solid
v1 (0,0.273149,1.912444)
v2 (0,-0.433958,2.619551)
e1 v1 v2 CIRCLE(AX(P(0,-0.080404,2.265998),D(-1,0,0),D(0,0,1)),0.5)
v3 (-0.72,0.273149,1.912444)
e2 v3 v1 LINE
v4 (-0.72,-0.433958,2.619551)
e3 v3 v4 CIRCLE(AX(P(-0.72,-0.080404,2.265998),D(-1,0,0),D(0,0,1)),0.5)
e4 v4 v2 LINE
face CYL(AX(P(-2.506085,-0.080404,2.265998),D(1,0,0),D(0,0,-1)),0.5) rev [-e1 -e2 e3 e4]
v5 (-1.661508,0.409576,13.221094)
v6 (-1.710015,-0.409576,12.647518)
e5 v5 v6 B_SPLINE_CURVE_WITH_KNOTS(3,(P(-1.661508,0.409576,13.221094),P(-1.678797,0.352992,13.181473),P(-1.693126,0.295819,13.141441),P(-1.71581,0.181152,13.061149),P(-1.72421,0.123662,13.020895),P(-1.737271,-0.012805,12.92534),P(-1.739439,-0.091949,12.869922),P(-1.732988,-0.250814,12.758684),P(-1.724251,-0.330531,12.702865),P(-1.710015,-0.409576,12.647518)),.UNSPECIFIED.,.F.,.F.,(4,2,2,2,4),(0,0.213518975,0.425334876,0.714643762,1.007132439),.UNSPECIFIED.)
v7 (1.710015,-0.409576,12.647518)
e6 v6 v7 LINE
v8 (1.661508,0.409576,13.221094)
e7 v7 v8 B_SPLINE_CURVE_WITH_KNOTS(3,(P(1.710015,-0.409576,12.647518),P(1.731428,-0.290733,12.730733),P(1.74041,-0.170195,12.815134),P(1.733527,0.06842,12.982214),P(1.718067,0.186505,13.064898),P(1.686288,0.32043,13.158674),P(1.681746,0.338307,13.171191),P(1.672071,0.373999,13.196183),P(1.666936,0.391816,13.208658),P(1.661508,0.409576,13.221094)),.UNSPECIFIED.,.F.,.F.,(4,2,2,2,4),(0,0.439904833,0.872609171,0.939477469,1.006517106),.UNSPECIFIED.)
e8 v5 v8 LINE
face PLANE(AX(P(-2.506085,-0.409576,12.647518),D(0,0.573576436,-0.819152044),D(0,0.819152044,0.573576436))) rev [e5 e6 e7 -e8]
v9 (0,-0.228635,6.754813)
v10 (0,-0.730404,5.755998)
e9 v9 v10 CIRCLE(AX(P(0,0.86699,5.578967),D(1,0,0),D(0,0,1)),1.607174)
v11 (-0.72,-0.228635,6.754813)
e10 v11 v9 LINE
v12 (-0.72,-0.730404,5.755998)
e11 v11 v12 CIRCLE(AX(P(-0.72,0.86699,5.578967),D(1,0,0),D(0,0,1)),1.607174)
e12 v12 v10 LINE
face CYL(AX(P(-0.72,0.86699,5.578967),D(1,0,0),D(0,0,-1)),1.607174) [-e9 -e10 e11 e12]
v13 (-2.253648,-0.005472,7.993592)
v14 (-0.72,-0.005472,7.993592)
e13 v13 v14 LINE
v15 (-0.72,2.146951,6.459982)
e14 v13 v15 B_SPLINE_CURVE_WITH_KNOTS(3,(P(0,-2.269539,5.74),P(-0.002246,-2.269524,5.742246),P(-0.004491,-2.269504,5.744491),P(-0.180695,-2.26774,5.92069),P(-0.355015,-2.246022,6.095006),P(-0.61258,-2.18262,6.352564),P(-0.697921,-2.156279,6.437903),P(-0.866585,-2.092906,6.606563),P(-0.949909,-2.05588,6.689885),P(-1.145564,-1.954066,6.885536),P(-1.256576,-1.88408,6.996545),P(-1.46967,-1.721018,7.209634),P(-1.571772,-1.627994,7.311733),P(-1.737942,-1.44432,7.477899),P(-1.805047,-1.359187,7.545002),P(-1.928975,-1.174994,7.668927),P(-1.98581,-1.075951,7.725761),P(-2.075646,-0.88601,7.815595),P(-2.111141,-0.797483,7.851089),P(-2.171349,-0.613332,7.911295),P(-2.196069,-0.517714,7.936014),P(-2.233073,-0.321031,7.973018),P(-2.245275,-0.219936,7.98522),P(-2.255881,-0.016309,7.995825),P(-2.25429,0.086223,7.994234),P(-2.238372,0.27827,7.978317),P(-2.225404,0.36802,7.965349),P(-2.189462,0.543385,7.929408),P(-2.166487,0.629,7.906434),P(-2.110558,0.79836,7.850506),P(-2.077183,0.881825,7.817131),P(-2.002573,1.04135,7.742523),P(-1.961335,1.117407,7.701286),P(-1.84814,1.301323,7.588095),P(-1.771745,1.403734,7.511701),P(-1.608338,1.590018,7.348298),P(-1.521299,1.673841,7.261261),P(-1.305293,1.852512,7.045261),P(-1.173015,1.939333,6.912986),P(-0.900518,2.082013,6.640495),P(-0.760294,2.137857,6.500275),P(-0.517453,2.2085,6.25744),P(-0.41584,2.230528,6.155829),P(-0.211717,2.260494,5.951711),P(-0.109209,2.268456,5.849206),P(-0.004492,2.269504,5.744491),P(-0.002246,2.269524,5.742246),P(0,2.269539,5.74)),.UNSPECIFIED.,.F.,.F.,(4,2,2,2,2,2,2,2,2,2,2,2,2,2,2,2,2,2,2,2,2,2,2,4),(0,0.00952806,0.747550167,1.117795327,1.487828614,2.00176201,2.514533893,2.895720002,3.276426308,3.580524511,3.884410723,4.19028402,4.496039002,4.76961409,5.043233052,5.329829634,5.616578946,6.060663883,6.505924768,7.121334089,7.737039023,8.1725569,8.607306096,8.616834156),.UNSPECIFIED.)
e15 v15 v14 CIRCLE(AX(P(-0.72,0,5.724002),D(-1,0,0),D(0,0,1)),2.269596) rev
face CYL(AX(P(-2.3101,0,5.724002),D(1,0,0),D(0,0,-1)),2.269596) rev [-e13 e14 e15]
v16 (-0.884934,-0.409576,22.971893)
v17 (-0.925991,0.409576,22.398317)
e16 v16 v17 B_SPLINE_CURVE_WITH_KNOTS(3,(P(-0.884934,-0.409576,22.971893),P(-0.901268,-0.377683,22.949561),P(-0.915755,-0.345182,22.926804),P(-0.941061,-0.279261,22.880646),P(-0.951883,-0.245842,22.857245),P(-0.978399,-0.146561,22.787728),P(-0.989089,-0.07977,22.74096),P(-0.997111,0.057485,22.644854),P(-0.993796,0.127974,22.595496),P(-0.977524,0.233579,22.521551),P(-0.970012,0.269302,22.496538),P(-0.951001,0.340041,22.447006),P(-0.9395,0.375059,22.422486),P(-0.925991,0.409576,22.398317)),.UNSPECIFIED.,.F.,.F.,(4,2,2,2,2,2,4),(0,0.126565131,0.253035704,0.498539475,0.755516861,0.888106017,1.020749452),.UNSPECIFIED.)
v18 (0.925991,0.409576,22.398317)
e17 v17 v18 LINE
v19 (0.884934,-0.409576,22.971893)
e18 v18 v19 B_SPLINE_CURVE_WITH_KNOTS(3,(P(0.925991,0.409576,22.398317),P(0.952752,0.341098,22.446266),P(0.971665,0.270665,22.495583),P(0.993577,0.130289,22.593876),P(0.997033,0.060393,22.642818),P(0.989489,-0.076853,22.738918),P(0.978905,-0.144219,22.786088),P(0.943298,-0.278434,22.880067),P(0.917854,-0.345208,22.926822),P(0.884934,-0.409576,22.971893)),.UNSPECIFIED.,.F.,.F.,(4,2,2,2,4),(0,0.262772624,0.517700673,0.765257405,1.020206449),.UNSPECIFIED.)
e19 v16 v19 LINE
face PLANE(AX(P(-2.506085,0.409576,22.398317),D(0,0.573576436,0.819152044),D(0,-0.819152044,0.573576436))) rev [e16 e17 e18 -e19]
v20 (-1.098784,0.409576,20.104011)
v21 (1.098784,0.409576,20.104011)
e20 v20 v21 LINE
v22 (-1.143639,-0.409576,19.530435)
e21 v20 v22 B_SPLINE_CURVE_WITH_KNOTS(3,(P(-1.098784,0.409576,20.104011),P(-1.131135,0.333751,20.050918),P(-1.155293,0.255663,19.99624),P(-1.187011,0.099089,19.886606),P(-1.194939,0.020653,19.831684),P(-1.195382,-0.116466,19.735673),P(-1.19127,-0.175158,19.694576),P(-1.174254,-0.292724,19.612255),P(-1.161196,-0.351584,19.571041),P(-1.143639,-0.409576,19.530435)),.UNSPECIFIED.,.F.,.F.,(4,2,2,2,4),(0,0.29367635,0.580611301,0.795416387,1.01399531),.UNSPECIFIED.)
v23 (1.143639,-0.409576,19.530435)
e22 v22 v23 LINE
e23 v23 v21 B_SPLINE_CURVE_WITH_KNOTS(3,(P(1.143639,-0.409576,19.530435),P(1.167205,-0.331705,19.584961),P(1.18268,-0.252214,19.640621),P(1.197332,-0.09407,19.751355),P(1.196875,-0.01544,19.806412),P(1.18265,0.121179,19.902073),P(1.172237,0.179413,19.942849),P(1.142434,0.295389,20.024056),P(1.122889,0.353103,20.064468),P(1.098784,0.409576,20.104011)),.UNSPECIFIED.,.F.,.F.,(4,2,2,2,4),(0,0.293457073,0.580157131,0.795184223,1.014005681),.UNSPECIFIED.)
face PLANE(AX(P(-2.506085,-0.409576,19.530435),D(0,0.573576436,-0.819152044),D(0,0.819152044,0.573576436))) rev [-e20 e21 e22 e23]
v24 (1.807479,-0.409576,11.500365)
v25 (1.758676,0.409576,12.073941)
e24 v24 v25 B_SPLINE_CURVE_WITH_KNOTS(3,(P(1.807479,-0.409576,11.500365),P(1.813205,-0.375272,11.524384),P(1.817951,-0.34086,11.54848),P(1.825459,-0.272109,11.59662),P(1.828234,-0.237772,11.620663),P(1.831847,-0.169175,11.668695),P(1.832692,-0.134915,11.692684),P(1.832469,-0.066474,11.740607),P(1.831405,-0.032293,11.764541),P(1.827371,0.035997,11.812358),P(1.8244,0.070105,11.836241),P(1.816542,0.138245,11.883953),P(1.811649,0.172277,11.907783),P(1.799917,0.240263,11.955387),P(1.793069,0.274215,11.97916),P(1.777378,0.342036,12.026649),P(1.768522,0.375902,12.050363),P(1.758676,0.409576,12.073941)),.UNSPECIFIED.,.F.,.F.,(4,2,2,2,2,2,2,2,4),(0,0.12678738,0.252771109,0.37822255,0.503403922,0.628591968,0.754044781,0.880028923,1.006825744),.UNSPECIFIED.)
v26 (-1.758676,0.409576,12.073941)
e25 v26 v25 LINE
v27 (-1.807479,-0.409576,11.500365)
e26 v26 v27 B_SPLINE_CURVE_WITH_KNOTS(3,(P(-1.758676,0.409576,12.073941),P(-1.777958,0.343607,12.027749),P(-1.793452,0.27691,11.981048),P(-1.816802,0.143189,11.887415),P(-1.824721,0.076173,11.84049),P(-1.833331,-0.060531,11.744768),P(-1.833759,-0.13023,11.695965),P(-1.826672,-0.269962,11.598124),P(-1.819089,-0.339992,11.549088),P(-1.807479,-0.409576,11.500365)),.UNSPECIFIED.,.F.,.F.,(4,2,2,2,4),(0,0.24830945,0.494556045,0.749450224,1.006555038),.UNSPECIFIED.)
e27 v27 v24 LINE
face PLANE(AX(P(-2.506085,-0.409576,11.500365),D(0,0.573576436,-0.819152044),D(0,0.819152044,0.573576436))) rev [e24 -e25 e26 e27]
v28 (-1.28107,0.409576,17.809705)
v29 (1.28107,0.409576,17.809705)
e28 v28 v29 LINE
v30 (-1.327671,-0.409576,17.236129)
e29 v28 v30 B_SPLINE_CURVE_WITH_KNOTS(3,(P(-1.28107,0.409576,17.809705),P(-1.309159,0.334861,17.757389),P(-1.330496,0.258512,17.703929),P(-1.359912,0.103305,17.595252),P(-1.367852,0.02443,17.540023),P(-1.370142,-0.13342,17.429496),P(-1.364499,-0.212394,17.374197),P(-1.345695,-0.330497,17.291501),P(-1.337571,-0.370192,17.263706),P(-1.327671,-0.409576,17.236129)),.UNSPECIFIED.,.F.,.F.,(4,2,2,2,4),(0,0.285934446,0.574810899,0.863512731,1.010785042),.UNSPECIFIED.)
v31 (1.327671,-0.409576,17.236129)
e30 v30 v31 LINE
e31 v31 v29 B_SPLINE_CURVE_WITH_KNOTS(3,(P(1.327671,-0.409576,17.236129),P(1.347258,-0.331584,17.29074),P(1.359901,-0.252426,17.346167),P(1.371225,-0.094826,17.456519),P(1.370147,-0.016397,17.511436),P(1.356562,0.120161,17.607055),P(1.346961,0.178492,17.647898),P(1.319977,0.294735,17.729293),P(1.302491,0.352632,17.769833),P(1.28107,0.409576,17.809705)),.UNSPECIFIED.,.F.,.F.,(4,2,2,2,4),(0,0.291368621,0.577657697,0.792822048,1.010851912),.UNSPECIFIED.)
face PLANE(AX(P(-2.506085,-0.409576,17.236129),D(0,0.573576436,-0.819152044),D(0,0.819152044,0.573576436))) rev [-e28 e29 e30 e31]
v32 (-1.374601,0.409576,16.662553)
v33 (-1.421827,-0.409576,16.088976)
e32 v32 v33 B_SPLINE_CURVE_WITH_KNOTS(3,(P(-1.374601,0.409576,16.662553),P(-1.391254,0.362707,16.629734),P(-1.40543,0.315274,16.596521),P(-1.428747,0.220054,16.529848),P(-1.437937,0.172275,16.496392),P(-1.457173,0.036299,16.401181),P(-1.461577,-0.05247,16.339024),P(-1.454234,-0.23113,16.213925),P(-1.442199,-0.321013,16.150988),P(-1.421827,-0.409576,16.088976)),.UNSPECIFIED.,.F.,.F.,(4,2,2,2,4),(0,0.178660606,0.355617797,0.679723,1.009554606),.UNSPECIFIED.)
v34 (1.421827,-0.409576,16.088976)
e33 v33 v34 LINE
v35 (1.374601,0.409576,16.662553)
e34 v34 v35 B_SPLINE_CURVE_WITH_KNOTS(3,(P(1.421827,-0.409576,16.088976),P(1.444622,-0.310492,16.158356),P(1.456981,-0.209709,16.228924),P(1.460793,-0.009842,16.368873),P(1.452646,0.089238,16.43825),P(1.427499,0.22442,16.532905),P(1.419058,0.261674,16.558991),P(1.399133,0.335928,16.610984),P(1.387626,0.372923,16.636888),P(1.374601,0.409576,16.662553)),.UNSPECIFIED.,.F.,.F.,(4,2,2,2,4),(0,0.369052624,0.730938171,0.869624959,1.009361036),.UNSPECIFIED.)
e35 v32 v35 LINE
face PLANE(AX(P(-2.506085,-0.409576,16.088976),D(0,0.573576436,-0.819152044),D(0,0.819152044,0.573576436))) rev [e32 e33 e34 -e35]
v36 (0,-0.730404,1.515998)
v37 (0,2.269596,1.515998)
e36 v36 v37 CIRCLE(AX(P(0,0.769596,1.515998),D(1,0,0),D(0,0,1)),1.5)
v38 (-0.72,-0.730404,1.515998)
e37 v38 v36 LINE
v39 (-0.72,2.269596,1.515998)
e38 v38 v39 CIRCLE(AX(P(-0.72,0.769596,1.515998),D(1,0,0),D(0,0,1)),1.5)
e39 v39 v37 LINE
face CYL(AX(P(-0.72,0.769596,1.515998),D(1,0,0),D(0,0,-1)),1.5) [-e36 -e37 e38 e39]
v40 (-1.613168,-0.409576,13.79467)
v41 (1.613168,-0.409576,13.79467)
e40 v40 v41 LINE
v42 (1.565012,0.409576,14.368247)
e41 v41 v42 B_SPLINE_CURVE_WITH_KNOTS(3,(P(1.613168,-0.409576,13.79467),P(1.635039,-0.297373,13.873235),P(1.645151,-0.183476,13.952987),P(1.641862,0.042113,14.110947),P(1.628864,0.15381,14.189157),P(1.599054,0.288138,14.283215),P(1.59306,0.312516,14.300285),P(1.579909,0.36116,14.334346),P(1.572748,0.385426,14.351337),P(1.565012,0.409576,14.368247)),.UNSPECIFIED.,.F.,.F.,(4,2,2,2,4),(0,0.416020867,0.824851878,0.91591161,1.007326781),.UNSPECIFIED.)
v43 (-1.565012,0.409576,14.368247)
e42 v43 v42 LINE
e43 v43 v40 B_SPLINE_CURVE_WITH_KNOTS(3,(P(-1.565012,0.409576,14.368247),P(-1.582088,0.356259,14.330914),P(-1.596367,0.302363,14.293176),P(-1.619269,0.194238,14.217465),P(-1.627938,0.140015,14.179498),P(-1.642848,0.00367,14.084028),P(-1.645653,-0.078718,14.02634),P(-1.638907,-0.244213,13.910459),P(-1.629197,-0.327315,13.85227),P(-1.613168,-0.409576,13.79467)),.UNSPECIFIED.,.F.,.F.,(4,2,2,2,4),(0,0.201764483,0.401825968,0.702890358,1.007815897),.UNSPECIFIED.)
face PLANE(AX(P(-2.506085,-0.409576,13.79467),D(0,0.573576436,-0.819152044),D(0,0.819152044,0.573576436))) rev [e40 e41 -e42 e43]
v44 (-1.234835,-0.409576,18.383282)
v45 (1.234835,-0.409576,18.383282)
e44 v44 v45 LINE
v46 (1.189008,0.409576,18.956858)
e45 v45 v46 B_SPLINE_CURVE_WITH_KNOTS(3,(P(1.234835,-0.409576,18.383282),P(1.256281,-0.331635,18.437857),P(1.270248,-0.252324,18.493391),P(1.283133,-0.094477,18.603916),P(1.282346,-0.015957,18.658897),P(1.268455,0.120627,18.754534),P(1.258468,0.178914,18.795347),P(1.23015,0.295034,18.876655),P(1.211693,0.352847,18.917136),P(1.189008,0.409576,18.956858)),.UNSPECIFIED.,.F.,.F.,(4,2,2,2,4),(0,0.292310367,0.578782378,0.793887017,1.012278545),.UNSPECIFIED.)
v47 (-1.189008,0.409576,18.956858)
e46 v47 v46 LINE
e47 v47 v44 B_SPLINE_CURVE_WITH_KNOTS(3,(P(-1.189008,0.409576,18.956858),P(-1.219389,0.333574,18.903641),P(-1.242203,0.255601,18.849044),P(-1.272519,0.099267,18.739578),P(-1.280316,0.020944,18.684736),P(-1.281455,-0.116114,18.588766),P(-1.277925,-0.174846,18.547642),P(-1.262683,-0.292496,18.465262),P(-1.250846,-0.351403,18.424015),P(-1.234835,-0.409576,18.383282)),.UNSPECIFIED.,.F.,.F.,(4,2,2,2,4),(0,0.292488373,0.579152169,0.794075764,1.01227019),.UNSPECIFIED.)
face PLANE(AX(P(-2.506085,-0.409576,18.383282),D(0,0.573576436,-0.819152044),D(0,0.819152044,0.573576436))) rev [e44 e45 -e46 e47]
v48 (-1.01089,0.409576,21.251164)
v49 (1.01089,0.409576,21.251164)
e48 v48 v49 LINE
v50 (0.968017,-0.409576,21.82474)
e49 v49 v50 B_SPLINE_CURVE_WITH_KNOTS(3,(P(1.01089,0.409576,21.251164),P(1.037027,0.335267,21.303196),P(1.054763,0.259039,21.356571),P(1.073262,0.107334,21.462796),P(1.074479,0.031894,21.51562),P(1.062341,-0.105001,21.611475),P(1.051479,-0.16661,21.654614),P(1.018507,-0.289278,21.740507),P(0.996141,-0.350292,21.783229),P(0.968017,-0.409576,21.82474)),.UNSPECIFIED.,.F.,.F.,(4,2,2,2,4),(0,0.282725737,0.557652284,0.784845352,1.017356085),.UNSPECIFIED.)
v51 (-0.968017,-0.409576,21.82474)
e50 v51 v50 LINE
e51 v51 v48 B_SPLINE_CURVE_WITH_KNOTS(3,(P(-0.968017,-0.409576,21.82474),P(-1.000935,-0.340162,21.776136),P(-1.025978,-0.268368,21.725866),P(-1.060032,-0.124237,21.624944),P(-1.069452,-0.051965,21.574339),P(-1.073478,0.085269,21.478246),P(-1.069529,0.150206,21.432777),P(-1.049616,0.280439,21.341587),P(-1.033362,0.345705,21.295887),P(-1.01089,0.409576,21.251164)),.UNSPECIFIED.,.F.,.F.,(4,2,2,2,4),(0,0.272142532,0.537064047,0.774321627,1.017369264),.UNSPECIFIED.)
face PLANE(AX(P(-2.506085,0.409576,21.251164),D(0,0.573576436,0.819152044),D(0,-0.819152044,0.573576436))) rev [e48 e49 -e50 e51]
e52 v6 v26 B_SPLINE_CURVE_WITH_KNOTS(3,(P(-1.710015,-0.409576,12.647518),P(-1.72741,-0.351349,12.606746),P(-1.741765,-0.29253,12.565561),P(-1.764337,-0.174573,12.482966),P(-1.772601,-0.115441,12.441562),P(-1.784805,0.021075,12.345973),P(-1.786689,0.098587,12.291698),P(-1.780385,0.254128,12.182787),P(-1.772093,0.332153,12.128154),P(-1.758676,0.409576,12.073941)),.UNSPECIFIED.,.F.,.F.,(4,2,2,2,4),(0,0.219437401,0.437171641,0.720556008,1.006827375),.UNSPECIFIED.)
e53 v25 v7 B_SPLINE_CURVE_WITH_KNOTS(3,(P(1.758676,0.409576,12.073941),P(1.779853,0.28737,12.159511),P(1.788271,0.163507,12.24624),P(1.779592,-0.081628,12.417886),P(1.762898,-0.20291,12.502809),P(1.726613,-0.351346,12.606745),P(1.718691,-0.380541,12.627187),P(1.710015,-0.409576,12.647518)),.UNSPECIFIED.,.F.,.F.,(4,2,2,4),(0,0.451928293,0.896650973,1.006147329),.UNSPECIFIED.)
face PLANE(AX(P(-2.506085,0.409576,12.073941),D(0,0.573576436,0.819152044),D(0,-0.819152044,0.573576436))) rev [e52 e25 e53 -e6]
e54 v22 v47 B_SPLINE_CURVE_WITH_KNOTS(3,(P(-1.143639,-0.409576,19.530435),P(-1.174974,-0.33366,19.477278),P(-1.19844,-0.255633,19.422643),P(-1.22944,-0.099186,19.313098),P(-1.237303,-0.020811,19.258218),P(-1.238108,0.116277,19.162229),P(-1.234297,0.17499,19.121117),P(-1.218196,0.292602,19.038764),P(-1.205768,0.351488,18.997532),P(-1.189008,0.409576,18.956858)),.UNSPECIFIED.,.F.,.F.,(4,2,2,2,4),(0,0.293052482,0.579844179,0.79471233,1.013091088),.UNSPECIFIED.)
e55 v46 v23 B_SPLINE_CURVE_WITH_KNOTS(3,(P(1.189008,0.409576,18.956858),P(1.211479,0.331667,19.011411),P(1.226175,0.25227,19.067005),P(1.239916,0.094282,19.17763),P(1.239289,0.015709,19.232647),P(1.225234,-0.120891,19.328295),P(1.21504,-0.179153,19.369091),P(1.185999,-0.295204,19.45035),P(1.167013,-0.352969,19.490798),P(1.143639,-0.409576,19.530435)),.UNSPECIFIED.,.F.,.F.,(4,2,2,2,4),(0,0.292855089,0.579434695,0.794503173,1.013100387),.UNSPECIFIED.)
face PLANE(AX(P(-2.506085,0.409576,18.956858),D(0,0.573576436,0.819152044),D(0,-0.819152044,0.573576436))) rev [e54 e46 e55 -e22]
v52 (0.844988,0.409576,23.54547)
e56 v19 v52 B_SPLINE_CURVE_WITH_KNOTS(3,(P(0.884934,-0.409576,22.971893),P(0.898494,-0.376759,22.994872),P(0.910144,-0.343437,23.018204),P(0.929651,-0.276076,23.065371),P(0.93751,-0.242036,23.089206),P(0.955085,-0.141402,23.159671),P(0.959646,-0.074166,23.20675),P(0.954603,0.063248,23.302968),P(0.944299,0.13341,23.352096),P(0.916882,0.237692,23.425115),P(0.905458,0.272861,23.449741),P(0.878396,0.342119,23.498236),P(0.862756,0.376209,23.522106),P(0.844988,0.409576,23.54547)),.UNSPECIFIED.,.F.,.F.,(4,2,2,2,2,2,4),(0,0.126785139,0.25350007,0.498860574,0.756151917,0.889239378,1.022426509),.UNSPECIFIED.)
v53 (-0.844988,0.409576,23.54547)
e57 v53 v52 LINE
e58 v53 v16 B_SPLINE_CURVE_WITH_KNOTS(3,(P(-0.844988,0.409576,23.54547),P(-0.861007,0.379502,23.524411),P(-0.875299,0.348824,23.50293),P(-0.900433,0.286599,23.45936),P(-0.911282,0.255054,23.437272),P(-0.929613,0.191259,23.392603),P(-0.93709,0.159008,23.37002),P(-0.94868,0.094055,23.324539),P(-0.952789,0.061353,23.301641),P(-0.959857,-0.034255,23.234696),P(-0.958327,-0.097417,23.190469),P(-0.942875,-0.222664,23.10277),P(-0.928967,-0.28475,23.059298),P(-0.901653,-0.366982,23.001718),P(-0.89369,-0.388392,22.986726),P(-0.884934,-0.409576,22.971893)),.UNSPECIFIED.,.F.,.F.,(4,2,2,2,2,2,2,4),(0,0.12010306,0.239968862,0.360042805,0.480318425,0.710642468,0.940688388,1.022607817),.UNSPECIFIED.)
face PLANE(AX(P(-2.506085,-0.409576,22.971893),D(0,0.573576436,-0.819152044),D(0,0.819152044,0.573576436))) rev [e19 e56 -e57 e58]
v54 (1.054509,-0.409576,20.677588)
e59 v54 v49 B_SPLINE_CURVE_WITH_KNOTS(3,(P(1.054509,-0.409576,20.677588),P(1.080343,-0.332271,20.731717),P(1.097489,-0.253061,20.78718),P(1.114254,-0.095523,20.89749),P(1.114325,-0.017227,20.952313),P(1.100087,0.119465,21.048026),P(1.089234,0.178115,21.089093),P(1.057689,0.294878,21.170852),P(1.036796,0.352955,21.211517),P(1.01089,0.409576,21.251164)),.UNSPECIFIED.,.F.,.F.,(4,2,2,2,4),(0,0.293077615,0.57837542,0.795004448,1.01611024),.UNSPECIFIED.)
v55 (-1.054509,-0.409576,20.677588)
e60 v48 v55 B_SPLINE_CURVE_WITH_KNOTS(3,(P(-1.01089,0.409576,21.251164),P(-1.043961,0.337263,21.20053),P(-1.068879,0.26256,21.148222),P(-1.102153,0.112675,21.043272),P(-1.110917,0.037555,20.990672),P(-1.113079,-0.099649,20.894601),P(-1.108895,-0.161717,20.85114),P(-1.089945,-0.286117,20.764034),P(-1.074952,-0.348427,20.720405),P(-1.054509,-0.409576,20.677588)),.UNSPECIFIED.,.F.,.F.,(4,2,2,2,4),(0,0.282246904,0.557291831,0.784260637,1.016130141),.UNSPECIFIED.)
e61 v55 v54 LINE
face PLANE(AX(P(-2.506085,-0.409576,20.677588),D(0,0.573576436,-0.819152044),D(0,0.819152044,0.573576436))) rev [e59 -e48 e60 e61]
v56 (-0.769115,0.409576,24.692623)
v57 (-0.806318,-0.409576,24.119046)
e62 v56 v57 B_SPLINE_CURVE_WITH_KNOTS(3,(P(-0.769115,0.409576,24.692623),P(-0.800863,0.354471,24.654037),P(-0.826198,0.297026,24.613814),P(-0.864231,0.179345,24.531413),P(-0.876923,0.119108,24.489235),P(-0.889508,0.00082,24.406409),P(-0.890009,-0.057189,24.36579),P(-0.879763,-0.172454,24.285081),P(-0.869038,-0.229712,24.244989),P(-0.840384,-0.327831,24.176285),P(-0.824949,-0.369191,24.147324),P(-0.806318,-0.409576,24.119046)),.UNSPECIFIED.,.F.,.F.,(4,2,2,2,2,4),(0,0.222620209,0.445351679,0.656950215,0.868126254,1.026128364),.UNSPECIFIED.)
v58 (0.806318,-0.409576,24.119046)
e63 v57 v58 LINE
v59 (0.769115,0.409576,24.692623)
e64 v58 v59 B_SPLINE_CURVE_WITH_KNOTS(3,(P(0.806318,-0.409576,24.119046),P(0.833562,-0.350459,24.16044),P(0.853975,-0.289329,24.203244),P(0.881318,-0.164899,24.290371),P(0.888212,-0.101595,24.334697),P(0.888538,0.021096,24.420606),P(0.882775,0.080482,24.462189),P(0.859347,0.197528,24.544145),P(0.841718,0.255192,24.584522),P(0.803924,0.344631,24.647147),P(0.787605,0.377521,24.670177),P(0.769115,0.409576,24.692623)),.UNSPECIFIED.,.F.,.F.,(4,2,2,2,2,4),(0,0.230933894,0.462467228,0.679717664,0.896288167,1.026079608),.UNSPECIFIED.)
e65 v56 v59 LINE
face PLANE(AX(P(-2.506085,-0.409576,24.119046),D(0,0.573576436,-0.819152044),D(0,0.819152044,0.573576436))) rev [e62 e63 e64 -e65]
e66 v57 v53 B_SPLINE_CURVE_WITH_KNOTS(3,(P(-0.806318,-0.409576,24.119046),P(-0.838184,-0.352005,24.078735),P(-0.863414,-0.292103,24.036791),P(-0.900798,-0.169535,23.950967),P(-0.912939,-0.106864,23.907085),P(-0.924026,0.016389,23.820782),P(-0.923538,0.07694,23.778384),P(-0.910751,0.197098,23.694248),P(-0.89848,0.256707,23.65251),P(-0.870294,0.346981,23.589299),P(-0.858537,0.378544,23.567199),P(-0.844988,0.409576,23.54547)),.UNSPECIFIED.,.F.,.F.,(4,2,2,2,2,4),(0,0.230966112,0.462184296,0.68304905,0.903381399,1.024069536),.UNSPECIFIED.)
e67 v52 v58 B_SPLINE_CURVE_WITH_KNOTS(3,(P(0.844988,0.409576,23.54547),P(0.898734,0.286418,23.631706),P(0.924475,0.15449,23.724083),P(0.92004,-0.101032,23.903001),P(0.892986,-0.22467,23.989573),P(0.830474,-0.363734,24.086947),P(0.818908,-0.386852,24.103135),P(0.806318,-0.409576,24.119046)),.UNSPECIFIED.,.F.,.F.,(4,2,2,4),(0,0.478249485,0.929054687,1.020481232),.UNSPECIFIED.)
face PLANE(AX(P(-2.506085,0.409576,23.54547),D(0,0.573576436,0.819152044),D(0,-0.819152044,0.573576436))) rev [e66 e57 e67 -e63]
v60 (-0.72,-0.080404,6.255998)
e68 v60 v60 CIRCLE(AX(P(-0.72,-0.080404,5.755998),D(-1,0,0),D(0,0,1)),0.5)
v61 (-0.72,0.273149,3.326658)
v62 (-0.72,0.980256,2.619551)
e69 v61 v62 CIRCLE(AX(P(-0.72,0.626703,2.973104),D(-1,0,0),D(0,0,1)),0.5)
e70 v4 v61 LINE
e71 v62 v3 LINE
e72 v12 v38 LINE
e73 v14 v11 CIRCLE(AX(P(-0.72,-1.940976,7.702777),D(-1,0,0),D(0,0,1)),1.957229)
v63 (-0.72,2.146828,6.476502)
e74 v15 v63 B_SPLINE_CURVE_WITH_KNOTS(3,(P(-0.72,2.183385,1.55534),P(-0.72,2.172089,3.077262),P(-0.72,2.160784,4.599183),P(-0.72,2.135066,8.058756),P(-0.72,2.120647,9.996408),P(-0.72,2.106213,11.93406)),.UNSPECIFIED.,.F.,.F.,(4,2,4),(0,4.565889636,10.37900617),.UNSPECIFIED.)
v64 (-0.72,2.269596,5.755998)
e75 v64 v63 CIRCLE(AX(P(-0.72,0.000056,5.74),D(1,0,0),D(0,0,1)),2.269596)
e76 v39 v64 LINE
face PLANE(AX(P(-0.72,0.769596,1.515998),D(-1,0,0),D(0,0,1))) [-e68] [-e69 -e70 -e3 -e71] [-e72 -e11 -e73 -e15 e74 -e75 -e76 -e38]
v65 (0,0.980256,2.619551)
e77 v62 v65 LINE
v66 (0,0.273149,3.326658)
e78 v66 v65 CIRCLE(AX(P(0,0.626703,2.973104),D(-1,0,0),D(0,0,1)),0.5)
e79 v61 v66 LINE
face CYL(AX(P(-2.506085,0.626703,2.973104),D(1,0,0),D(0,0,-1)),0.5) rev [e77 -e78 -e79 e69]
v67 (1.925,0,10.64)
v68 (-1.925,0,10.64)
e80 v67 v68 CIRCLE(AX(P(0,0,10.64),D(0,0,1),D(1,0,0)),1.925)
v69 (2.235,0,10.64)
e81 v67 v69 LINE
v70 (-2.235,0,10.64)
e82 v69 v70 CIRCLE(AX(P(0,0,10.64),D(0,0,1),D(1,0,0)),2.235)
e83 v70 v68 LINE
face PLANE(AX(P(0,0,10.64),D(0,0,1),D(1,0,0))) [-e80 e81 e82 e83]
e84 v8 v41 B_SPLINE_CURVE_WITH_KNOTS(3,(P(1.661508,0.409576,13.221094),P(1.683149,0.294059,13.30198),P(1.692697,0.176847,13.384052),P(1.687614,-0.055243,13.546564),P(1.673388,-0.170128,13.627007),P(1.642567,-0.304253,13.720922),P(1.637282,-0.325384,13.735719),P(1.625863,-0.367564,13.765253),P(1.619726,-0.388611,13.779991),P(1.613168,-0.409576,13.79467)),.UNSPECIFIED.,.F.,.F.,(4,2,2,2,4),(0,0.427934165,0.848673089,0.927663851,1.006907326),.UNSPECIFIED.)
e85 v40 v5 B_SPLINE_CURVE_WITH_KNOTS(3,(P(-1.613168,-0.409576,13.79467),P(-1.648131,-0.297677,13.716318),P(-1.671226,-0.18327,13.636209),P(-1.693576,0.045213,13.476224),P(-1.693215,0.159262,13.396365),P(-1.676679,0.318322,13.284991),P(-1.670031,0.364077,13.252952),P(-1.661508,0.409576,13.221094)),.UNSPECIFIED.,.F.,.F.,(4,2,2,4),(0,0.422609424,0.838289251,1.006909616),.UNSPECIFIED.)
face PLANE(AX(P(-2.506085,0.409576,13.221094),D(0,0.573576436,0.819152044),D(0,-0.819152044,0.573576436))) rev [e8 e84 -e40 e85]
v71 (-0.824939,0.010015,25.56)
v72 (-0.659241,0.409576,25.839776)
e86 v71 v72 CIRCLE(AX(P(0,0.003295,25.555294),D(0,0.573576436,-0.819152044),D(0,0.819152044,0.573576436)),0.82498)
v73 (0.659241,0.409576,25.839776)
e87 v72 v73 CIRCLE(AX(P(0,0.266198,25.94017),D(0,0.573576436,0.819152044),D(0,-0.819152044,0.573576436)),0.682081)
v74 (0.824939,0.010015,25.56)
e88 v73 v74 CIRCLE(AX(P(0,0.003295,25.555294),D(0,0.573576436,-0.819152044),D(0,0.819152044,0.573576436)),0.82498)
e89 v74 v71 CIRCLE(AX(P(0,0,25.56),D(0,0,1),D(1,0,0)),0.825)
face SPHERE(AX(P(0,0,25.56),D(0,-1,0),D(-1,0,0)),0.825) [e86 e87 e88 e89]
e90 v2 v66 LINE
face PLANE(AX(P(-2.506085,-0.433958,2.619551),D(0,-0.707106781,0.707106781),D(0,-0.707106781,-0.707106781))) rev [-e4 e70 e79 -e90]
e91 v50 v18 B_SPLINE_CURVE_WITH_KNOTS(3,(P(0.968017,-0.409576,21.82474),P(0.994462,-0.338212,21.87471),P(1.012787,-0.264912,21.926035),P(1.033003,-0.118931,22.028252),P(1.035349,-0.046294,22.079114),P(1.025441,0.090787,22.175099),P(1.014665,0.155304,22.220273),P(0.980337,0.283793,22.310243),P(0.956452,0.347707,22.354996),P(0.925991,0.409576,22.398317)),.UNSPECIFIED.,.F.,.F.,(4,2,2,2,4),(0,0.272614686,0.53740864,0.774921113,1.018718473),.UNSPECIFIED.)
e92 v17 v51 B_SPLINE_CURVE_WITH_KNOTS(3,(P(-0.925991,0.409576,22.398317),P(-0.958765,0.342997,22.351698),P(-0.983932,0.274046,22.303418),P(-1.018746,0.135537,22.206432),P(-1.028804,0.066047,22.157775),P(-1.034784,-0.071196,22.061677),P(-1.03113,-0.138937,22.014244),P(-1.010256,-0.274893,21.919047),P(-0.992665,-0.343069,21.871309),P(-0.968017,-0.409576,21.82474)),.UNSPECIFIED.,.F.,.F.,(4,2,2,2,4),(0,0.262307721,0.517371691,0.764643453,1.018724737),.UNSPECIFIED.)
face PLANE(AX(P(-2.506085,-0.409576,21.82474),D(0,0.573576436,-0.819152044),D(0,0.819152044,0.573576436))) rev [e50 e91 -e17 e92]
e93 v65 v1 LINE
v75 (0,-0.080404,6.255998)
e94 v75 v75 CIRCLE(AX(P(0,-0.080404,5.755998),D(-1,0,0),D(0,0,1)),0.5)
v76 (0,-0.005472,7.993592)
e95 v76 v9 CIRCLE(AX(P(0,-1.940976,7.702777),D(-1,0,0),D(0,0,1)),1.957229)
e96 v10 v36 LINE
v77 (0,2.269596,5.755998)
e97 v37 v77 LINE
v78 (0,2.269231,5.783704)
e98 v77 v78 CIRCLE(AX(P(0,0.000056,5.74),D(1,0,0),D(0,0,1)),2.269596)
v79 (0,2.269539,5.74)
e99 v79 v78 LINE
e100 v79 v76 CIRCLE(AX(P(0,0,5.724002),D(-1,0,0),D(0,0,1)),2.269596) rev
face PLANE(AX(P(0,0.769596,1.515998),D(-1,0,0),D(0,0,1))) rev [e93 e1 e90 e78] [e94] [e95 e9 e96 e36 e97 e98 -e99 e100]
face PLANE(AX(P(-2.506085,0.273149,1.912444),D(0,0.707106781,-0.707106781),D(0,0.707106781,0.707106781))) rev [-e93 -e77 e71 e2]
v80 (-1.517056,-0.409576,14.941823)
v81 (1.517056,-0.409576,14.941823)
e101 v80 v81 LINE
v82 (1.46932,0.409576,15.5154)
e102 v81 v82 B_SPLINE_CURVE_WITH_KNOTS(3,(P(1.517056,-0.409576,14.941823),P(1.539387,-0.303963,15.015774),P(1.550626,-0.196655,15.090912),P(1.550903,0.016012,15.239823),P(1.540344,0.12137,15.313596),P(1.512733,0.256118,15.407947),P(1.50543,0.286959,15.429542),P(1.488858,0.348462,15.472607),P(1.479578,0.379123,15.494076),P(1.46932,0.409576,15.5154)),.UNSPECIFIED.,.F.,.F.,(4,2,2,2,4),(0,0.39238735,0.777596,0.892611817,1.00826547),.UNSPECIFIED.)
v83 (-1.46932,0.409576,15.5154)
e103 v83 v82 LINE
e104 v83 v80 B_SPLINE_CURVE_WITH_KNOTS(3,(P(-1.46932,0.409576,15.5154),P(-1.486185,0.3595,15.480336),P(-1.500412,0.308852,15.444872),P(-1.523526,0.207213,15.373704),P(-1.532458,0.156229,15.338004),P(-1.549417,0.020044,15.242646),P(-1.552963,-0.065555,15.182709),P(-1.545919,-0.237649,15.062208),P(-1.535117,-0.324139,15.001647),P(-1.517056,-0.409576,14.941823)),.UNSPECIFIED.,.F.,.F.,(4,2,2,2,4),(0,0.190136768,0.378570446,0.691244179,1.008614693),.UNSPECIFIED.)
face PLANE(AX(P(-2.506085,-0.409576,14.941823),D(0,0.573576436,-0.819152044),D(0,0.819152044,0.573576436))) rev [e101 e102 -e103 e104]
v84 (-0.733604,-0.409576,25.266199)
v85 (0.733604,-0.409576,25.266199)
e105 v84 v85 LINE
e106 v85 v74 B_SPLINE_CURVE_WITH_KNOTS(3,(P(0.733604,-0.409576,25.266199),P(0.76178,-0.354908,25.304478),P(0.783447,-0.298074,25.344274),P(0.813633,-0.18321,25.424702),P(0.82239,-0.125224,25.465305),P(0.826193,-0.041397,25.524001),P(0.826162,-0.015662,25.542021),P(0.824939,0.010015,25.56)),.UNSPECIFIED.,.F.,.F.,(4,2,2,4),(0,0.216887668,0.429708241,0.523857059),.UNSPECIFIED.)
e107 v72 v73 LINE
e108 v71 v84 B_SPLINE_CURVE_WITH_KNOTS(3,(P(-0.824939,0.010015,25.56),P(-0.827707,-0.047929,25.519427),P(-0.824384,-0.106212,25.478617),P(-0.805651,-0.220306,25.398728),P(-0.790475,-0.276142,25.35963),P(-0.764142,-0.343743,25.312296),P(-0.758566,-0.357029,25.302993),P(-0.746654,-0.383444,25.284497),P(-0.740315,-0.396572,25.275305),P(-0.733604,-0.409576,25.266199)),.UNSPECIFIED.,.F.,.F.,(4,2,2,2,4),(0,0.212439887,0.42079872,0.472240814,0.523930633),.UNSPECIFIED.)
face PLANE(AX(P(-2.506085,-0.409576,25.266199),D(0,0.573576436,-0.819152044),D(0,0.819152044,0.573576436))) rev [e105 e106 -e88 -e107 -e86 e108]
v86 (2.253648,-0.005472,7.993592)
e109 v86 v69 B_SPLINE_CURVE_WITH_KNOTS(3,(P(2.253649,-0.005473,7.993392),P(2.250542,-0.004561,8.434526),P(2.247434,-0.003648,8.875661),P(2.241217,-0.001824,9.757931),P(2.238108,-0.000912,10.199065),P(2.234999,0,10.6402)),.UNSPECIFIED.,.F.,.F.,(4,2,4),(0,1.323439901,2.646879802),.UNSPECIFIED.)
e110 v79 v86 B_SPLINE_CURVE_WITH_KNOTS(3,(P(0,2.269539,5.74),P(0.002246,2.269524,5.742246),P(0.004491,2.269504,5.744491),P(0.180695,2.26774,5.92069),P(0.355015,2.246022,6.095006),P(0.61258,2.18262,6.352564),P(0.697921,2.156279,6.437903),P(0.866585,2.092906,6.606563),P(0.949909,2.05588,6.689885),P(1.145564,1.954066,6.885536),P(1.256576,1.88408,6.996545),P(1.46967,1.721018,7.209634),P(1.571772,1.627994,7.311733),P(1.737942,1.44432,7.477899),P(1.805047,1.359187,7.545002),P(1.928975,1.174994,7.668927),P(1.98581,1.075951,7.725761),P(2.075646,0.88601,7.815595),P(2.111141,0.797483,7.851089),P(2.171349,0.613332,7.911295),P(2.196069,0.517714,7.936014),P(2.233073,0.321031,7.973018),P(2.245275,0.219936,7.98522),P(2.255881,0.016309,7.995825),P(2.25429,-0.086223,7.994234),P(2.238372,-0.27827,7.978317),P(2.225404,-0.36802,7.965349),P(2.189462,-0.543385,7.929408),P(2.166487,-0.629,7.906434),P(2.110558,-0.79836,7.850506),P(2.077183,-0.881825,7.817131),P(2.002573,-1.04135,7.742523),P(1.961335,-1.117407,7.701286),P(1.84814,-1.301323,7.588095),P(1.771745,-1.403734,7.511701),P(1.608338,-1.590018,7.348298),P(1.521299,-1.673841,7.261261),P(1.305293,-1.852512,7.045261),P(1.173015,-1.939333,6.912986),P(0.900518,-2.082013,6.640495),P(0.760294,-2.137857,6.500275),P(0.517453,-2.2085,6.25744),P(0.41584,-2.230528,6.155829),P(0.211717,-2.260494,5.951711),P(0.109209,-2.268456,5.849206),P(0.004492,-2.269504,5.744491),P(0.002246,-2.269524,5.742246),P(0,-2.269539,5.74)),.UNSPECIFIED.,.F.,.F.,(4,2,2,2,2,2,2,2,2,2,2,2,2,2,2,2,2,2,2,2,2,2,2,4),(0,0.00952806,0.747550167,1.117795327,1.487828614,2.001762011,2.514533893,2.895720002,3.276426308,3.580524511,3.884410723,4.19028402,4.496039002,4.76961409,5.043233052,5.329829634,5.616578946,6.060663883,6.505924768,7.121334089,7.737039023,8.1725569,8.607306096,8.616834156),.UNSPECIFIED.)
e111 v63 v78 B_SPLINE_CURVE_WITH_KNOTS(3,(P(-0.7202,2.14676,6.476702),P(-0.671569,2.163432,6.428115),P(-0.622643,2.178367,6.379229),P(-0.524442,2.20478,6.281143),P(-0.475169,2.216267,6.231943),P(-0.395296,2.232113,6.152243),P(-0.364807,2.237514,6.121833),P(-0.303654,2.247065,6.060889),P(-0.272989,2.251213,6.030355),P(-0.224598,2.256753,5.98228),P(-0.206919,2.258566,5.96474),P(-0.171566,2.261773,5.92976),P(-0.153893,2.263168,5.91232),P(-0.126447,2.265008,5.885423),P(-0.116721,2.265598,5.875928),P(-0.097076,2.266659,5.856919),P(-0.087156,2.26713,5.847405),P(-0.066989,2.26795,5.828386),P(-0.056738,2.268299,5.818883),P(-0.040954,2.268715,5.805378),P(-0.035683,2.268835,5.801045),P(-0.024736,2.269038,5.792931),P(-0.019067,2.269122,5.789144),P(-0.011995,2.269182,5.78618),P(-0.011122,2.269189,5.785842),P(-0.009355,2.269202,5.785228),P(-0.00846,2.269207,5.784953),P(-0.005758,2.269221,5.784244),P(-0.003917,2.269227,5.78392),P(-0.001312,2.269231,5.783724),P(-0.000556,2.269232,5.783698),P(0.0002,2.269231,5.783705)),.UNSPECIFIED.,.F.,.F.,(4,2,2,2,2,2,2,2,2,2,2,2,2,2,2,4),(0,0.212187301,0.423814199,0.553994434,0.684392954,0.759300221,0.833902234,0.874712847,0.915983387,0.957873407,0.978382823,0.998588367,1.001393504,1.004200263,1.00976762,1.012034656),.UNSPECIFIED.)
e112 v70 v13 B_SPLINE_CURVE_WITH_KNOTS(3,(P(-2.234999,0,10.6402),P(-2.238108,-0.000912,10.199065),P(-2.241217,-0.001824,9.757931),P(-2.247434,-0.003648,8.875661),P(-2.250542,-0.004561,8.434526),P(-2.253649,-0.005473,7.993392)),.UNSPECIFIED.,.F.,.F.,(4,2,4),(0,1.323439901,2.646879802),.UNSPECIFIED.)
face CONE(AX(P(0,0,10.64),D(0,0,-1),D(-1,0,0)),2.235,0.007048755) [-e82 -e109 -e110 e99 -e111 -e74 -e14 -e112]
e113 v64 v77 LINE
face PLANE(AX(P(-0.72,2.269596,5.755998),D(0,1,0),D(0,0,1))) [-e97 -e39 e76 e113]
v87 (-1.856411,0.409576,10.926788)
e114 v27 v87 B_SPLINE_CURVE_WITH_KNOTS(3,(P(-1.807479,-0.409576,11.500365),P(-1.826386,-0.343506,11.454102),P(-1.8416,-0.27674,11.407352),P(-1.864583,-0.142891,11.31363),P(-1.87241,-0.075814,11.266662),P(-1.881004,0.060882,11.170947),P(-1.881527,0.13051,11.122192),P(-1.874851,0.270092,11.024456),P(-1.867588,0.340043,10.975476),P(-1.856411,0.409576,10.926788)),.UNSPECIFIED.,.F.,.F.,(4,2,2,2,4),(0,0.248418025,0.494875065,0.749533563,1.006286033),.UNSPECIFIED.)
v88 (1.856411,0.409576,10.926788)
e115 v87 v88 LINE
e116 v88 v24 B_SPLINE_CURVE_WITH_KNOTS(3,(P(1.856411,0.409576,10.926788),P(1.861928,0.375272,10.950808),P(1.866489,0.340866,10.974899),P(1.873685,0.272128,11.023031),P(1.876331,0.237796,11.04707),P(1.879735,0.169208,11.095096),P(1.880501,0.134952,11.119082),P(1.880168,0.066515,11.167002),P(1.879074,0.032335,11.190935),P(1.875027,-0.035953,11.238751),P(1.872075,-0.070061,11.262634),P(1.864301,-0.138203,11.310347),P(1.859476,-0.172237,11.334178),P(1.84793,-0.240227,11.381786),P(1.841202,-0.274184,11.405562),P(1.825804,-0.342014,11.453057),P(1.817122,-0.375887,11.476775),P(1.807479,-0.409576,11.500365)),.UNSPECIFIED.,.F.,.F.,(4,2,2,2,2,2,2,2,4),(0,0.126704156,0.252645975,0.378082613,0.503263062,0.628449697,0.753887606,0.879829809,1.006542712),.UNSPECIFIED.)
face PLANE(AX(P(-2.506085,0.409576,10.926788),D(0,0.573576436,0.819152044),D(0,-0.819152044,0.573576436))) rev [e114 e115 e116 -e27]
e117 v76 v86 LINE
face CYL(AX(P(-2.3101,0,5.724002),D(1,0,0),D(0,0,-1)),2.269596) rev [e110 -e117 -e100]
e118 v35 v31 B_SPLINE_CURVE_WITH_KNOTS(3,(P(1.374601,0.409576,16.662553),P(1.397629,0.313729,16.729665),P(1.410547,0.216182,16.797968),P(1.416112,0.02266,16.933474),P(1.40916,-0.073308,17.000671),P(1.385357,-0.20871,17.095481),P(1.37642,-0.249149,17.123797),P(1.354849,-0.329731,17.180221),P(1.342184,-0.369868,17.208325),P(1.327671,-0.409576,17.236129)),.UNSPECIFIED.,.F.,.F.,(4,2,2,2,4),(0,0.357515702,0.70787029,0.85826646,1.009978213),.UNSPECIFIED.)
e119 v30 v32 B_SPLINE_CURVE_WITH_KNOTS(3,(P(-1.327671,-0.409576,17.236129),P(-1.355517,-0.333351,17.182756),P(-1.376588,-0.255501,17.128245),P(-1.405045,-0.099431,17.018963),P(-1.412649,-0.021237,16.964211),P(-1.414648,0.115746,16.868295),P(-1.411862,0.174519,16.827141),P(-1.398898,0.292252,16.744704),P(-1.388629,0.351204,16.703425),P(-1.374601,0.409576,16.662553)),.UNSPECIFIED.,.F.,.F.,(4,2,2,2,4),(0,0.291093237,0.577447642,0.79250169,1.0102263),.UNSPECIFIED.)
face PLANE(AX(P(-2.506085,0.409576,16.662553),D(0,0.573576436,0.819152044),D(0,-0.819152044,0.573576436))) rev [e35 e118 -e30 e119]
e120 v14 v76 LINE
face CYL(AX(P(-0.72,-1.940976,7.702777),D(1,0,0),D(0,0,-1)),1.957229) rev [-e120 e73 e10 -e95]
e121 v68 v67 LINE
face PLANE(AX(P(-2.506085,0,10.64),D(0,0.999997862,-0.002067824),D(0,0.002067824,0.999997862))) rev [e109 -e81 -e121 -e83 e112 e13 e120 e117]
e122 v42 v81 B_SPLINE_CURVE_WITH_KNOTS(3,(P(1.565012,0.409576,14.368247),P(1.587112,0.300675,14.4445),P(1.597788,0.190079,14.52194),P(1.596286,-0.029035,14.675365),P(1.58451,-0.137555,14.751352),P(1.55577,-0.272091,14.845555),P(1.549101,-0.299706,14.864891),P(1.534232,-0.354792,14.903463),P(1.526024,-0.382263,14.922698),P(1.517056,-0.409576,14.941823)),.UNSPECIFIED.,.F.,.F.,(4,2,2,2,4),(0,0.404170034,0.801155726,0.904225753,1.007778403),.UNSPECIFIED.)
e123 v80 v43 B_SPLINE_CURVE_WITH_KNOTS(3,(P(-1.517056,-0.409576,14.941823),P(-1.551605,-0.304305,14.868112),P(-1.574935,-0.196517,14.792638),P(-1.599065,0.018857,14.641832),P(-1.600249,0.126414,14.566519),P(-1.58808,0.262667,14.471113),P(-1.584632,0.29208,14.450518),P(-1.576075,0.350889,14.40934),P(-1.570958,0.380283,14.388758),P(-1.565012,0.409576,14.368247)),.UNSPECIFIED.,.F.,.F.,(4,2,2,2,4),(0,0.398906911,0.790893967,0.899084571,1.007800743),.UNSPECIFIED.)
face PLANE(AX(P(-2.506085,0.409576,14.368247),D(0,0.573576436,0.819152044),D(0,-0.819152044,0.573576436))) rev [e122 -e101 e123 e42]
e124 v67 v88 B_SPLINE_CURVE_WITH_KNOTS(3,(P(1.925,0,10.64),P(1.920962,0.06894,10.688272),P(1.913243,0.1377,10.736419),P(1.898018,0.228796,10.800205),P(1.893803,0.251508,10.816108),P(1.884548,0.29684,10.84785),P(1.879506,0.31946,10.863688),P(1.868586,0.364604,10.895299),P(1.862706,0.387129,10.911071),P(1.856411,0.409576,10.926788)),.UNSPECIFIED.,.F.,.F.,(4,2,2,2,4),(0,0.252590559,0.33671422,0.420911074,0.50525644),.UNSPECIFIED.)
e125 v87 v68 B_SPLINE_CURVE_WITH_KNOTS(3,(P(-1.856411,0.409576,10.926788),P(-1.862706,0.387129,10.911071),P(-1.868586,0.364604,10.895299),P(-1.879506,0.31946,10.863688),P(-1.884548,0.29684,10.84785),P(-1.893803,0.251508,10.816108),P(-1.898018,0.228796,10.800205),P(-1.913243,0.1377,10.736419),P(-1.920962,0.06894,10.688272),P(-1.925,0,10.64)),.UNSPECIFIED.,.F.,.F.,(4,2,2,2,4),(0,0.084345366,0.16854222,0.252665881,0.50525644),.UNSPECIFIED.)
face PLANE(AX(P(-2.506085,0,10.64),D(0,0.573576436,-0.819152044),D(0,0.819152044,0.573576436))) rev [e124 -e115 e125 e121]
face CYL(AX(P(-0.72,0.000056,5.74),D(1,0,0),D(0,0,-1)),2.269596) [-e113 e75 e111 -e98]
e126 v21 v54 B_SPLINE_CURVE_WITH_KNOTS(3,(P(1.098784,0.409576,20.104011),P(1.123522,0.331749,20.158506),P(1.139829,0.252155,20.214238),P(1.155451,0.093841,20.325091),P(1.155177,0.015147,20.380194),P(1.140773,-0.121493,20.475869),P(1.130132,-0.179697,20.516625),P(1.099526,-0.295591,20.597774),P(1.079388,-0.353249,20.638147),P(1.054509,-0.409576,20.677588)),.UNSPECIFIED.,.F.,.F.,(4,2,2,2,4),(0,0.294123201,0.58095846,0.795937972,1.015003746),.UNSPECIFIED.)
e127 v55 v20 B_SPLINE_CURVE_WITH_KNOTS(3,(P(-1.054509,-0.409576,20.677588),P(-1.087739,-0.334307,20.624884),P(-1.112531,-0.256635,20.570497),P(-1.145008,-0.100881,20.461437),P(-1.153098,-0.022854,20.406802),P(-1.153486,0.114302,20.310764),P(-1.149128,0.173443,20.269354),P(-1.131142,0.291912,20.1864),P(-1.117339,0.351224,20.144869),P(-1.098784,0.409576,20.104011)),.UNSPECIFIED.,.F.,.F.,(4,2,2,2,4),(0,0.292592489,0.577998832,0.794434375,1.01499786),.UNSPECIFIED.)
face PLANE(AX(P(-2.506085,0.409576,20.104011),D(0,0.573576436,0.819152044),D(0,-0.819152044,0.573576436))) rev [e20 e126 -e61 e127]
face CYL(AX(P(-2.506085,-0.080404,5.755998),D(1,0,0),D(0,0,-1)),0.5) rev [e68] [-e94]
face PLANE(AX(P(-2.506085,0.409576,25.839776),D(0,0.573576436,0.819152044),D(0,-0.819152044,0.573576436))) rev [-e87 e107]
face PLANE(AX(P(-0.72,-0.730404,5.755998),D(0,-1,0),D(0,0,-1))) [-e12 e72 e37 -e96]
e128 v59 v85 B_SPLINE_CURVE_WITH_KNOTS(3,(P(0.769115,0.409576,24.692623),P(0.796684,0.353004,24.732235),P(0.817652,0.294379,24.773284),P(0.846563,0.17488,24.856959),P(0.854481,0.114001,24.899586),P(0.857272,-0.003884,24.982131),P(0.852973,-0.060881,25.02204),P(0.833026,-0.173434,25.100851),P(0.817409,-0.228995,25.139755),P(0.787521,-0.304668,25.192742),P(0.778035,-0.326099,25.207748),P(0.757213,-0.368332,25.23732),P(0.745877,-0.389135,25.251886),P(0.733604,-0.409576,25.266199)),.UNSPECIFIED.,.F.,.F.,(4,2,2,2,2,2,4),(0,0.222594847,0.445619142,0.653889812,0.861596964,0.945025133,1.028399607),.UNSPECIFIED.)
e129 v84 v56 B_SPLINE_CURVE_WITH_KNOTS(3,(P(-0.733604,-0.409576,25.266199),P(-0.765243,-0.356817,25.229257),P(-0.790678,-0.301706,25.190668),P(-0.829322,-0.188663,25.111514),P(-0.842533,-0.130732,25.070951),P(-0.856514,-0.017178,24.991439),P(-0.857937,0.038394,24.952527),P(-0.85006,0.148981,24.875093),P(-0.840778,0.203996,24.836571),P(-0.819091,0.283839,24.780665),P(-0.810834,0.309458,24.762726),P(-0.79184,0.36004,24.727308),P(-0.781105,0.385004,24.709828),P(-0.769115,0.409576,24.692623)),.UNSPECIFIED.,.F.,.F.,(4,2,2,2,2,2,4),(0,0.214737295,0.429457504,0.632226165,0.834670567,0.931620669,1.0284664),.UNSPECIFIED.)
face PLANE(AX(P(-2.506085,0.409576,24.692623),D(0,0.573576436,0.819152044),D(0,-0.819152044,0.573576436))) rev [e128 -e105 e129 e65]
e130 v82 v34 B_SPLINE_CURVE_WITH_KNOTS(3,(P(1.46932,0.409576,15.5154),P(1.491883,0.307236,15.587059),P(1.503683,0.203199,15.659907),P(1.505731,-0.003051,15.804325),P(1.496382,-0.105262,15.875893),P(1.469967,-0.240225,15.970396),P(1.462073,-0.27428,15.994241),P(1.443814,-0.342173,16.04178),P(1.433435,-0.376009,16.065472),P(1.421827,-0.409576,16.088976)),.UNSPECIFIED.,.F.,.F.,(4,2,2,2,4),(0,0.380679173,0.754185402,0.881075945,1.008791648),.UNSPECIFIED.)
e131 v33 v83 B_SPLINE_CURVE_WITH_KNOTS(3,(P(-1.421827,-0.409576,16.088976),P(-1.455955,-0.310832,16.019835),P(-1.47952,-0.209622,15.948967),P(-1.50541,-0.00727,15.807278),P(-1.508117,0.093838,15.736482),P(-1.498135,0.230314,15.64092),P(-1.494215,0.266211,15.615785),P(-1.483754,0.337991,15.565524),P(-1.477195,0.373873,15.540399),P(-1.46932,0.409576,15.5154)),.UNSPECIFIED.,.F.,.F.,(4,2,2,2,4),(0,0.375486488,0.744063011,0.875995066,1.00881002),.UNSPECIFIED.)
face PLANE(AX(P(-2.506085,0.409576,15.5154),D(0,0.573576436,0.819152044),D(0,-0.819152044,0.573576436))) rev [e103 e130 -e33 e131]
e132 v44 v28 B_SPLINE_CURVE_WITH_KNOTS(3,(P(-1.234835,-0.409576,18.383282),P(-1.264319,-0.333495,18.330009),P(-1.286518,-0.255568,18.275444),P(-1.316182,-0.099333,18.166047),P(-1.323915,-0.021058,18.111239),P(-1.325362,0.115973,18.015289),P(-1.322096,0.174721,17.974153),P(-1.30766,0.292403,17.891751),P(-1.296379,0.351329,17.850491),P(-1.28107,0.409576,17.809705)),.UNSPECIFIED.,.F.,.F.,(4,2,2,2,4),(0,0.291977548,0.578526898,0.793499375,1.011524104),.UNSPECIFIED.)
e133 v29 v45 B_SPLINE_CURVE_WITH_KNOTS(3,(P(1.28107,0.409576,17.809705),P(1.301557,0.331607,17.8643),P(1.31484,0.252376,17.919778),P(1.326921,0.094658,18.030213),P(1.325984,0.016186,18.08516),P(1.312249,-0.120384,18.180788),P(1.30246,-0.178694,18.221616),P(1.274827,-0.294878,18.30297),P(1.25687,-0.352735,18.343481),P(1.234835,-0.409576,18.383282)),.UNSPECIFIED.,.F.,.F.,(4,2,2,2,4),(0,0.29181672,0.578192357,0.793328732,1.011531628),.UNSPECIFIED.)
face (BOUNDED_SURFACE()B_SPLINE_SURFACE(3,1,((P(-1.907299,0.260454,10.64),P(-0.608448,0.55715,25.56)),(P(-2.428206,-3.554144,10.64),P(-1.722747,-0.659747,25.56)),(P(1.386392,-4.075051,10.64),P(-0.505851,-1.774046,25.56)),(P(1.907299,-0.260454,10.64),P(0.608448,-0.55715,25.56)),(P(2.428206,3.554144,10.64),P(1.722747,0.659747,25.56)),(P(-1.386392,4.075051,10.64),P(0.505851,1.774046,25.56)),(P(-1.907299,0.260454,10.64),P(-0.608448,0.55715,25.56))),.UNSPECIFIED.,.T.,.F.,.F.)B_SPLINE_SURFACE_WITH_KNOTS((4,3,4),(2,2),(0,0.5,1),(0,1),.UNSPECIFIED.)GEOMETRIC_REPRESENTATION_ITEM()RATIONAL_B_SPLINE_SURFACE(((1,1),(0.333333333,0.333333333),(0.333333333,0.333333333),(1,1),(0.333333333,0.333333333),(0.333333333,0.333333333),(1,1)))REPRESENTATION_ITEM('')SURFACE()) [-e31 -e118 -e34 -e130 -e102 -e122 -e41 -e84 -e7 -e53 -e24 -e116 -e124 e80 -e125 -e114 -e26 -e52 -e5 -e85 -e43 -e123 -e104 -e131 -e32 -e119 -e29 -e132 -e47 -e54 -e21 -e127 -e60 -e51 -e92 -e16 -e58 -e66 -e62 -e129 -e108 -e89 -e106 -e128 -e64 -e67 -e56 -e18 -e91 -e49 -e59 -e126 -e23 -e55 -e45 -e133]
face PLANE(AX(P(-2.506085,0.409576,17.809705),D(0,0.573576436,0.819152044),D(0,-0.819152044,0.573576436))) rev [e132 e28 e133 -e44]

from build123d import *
from OCP.BRepAlgoAPI import BRepAlgoAPI_Cut
from OCP.TopTools import TopTools_ListOfShape

# Parameters (mm, degrees)
SKETCH4_R               = 2.235
SKETCH3_R               = 2.31
CUT_EXTRUDE1_DEPTH      = 27.58647073088115
CUT_EXTRUDE1_DEPTH_BACK = 27.58647073088115
BOSS_EXTRUDE1_DEPTH     = 0.72
CUT_EXTRUDE2_DEPTH      = 27.578153590375337
CUT_EXTRUDE2_DEPTH_BACK = 27.578153590375337
SKETCH11_R              = 0.5000000000000008
CUT_EXTRUDE3_DEPTH      = 27.578153590375337
CUT_EXTRUDE3_DEPTH_BACK = 27.578153590375337
CUT_EXTRUDE4_DEPTH      = 27.578153590375337
CUT_EXTRUDE4_DEPTH_BACK = 27.578153590375337


with BuildPart() as part:
    # Sketch4 → Loft1 section 0
    with BuildSketch(Plane.XY.offset(10.64)):
        Circle(SKETCH4_R)
    # Sketch3 → Loft1 section 1
    with BuildSketch(Plane.XY):
        Circle(SKETCH3_R)
    loft()

    # Loft2: read off the stored shape, not the designer's step
    # Loft2: loft between two sections, ruled curve by curve
    loft2_from = [
        Edge.make_bspline([(-1.907298859, 0.260453572, 10.64), (-2.428206003, -3.554144145, 10.64), (1.386391714, -4.07505129, 10.64), (1.907298859, -0.260453572, 10.64), (2.428206003, 3.554144145, 10.64), (-1.386391714, 4.07505129, 10.64), (-1.907298859, 0.260453572, 10.64)], [0, 0, 0, 0, 0.5, 0.5, 0.5, 1, 1, 1, 1], 3, [1, 0.333333333333333, 0.333333333333333, 1, 0.333333333333333, 0.333333333333333, 1]),
    ]
    loft2_to = [
        Edge.make_bspline([(-0.608448322, 0.557149567, 25.56), (-1.722747455, -0.659747077, 25.56), (-0.505850812, -1.77404621, 25.56), (0.608448322, -0.557149567, 25.56), (1.722747455, 0.659747077, 25.56), (0.505850812, 1.77404621, 25.56), (-0.608448322, 0.557149567, 25.56)], [0, 0, 0, 0, 0.5, 0.5, 0.5, 1, 1, 1, 1], 3, [1, 0.333333333333333, 0.333333333333333, 1, 0.333333333333333, 0.333333333333333, 1]),
    ]
    loft2 = Solid(Shell([*[Face.make_surface_from_curves(loft2_from[k], loft2_to[k]) for k in range(1)], Face(Wire(loft2_from)), Face(Wire(loft2_to))]))
    add(loft2)

    # Revolve3: read off the stored shape, not the designer's step
    # Revolve3 outline → Revolve3 (revolve)
    with BuildSketch(Plane.XZ):
        with BuildLine():
            Line((0, 25.56), (0.825, 25.56))
            ThreePointArc((0.825, 25.56), (0.583363094, 26.143363094), (0, 26.385))
            Line((0, 26.385), (0, 25.56))
        make_face()
    revolve(axis=Axis((0, 0, 0), (0, 0, 1)))


with BuildPart() as cut_extrude1_tool:
    # Sketch9 → Cut-Extrude1 (new, two sides: drawn at the far end of the back side and taken through both)
    with BuildSketch(Plane(origin=(0, 0, 0), x_dir=(0, 0, -1), z_dir=(1, 0, 0)).offset(-CUT_EXTRUDE1_DEPTH_BACK)):
        with BuildLine():
            Line((0, 2.31), (-5.74, 2.269539473684211))
            ThreePointArc((-5.74, 2.269539473684211), (-7.993598162174239, -2.37e-14), (-5.74, -2.2695394736842105))
            Line((-5.74, -2.2695394736842105), (0, -2.31))
            Line((0, -2.31), (0, 2.31))
        make_face()
    extrude(amount=CUT_EXTRUDE1_DEPTH + CUT_EXTRUDE1_DEPTH_BACK)


with BuildPart() as part_1:
    add(part.part)

    # Cut-Extrude1: cut by cut_extrude1_tool, with a tolerance
    cut_extrude1_stock = TopTools_ListOfShape()
    cut_extrude1_stock.Append(part_1.part.wrapped)
    cut_extrude1_tools = TopTools_ListOfShape()
    cut_extrude1_tools.Append(cut_extrude1_tool.part.wrapped)
    cut_extrude1_cut = BRepAlgoAPI_Cut()
    cut_extrude1_cut.SetArguments(cut_extrude1_stock)
    cut_extrude1_cut.SetTools(cut_extrude1_tools)
    cut_extrude1_cut.SetFuzzyValue(0.00001)
    cut_extrude1_cut.Build()
    add(Compound.cast(cut_extrude1_cut.Shape()).solids(), mode=Mode.REPLACE)

    # Sketch10 → Boss-Extrude1 (add)
    with BuildSketch(Plane(origin=(0, 0, 0), x_dir=(0, 0, -1), z_dir=(1, 0, 0))):
        with BuildLine():
            Line((-5.755997693658497, 2.2695958558327507), (-1.515997693658497, 2.2695958558327507))
            ThreePointArc((-1.515997693658497, 2.2695958558327507), (-0.01599769365849646, 0.769595855832751), (-1.5159976936584965, -0.7304041441672493))
            Line((-1.5159976936584965, -0.7304041441672493), (-5.755997693658497, -0.7304041441672493))
            ThreePointArc((-5.755997693658497, -0.7304041441672493), (-6.300456135431979, -0.5691848113978423), (-6.754869150888661, -0.22869181666727964))
            ThreePointArc((-6.754869150888661, -0.22869181666727964), (-7.3637940337605725, -0.01339161533026489), (-8.009638140649475, -0.0079990952139372))
            ThreePointArc((-8.009638140649475, -0.0079990952139372), (-7.353348220945002, 1.5963799024633214), (-5.755997693658497, 2.2695958558327507))
        make_face()
    extrude(amount=-BOSS_EXTRUDE1_DEPTH)

    # Sketch11 → Cut-Extrude2 (cut, two sides: drawn at the far end of the back side and taken through both)
    with BuildSketch(Plane(origin=(0, 0, 0), x_dir=(0, 0, -1), z_dir=(1, 0, 0)).offset(-CUT_EXTRUDE2_DEPTH_BACK)):
        with Locations(Location((-5.755997693658496, -0.08040414416724939, 0), (0, 0, 179.999999999))):
            Circle(SKETCH11_R)
    extrude(amount=CUT_EXTRUDE2_DEPTH + CUT_EXTRUDE2_DEPTH_BACK, mode=Mode.SUBTRACT)

    # Sketch12 → Cut-Extrude3 (cut, two sides: drawn at the far end of the back side and taken through both)
    with BuildSketch(Plane(origin=(0, 0, 0), x_dir=(0, 0, -1), z_dir=(1, 0, 0)).offset(-CUT_EXTRUDE3_DEPTH_BACK)):
        with BuildLine():
            Line((-2.61955108425177, -0.4339575347605234), (-3.326657865438317, 0.2731492464260242))
            ThreePointArc((-3.326657865438317, 0.2731492464260242), (-3.3266578654383174, 0.980256027612572), (-2.6195510842517695, 0.9802560276125718))
            Line((-2.6195510842517695, 0.9802560276125718), (-1.9124443030652216, 0.27314924642602484))
            ThreePointArc((-1.9124443030652216, 0.27314924642602484), (-1.9124443030652214, -0.43395753476052357), (-2.61955108425177, -0.4339575347605234))
        make_face()
    extrude(amount=CUT_EXTRUDE3_DEPTH + CUT_EXTRUDE3_DEPTH_BACK, mode=Mode.SUBTRACT)

    # Sketch8 → Cut-Extrude4 (cut, two sides: drawn at the far end of the back side and taken through both)
    with BuildSketch(Plane(origin=(0, 0, 0), x_dir=(0, 0, -1), z_dir=(1, 0, 0)).offset(-CUT_EXTRUDE4_DEPTH_BACK)):
        Polygon((-10.64, 4.3e-16), (-10.92678821817553, 0.4095760221444918), (-11.500364653175215, -0.40957602021520884), (-12.073941088175136, 0.40957602214423094), (-12.647517523174814, -0.40957602021521683), (-13.221093958174729, 0.40957602214440114), (-13.794670393174655, -0.40957602021506484), (-14.368246828174327, 0.4095760221443932), (-14.941823263174012, -0.409576020215047), (-15.515399698173928, 0.40957602214438515), (-16.088976133173613, -0.409576020215055), (-16.662552568173783, 0.40957602214437716), (-17.236129003173215, -0.4095760202152489), (-17.809705438173125, 0.4095760221443691), (-18.38328187317281, -0.40957602021507106), (-18.956858308172723, 0.4095760221443611), (-19.53043474317241, -0.40957602021507905), (-20.10401117817232, 0.4095760221443531), (-20.67758761317201, -0.4095760202150871), (-21.25116404817192, 0.4095760221443451), (-21.82474048317161, -0.4095760202150951), (-22.398316918171524, 0.4095760221443371), (-22.971893353171208, -0.40957602021510314), (-23.545469788171122, 0.4095760221443291), (-24.119046223170805, -0.4095760202151111), (-24.69262265817072, 0.4095760221443211), (-25.266199093170407, -0.40957602021511913), (-25.839775528170343, 0.4095760221440387), (-26.413351963170005, -0.4095760202151271), (-26.986928398169923, 0.40957602214430294), (-26.986928398169923, -4.419260588317123), (-4.451704701186554, -4.419260588317123), (-4.451704701186554, -2.80017242629016), (-7.993591564895423, -0.00547231851227717), align=None)
    extrude(amount=CUT_EXTRUDE4_DEPTH + CUT_EXTRUDE4_DEPTH_BACK, mode=Mode.SUBTRACT)


solid = part_1.part
